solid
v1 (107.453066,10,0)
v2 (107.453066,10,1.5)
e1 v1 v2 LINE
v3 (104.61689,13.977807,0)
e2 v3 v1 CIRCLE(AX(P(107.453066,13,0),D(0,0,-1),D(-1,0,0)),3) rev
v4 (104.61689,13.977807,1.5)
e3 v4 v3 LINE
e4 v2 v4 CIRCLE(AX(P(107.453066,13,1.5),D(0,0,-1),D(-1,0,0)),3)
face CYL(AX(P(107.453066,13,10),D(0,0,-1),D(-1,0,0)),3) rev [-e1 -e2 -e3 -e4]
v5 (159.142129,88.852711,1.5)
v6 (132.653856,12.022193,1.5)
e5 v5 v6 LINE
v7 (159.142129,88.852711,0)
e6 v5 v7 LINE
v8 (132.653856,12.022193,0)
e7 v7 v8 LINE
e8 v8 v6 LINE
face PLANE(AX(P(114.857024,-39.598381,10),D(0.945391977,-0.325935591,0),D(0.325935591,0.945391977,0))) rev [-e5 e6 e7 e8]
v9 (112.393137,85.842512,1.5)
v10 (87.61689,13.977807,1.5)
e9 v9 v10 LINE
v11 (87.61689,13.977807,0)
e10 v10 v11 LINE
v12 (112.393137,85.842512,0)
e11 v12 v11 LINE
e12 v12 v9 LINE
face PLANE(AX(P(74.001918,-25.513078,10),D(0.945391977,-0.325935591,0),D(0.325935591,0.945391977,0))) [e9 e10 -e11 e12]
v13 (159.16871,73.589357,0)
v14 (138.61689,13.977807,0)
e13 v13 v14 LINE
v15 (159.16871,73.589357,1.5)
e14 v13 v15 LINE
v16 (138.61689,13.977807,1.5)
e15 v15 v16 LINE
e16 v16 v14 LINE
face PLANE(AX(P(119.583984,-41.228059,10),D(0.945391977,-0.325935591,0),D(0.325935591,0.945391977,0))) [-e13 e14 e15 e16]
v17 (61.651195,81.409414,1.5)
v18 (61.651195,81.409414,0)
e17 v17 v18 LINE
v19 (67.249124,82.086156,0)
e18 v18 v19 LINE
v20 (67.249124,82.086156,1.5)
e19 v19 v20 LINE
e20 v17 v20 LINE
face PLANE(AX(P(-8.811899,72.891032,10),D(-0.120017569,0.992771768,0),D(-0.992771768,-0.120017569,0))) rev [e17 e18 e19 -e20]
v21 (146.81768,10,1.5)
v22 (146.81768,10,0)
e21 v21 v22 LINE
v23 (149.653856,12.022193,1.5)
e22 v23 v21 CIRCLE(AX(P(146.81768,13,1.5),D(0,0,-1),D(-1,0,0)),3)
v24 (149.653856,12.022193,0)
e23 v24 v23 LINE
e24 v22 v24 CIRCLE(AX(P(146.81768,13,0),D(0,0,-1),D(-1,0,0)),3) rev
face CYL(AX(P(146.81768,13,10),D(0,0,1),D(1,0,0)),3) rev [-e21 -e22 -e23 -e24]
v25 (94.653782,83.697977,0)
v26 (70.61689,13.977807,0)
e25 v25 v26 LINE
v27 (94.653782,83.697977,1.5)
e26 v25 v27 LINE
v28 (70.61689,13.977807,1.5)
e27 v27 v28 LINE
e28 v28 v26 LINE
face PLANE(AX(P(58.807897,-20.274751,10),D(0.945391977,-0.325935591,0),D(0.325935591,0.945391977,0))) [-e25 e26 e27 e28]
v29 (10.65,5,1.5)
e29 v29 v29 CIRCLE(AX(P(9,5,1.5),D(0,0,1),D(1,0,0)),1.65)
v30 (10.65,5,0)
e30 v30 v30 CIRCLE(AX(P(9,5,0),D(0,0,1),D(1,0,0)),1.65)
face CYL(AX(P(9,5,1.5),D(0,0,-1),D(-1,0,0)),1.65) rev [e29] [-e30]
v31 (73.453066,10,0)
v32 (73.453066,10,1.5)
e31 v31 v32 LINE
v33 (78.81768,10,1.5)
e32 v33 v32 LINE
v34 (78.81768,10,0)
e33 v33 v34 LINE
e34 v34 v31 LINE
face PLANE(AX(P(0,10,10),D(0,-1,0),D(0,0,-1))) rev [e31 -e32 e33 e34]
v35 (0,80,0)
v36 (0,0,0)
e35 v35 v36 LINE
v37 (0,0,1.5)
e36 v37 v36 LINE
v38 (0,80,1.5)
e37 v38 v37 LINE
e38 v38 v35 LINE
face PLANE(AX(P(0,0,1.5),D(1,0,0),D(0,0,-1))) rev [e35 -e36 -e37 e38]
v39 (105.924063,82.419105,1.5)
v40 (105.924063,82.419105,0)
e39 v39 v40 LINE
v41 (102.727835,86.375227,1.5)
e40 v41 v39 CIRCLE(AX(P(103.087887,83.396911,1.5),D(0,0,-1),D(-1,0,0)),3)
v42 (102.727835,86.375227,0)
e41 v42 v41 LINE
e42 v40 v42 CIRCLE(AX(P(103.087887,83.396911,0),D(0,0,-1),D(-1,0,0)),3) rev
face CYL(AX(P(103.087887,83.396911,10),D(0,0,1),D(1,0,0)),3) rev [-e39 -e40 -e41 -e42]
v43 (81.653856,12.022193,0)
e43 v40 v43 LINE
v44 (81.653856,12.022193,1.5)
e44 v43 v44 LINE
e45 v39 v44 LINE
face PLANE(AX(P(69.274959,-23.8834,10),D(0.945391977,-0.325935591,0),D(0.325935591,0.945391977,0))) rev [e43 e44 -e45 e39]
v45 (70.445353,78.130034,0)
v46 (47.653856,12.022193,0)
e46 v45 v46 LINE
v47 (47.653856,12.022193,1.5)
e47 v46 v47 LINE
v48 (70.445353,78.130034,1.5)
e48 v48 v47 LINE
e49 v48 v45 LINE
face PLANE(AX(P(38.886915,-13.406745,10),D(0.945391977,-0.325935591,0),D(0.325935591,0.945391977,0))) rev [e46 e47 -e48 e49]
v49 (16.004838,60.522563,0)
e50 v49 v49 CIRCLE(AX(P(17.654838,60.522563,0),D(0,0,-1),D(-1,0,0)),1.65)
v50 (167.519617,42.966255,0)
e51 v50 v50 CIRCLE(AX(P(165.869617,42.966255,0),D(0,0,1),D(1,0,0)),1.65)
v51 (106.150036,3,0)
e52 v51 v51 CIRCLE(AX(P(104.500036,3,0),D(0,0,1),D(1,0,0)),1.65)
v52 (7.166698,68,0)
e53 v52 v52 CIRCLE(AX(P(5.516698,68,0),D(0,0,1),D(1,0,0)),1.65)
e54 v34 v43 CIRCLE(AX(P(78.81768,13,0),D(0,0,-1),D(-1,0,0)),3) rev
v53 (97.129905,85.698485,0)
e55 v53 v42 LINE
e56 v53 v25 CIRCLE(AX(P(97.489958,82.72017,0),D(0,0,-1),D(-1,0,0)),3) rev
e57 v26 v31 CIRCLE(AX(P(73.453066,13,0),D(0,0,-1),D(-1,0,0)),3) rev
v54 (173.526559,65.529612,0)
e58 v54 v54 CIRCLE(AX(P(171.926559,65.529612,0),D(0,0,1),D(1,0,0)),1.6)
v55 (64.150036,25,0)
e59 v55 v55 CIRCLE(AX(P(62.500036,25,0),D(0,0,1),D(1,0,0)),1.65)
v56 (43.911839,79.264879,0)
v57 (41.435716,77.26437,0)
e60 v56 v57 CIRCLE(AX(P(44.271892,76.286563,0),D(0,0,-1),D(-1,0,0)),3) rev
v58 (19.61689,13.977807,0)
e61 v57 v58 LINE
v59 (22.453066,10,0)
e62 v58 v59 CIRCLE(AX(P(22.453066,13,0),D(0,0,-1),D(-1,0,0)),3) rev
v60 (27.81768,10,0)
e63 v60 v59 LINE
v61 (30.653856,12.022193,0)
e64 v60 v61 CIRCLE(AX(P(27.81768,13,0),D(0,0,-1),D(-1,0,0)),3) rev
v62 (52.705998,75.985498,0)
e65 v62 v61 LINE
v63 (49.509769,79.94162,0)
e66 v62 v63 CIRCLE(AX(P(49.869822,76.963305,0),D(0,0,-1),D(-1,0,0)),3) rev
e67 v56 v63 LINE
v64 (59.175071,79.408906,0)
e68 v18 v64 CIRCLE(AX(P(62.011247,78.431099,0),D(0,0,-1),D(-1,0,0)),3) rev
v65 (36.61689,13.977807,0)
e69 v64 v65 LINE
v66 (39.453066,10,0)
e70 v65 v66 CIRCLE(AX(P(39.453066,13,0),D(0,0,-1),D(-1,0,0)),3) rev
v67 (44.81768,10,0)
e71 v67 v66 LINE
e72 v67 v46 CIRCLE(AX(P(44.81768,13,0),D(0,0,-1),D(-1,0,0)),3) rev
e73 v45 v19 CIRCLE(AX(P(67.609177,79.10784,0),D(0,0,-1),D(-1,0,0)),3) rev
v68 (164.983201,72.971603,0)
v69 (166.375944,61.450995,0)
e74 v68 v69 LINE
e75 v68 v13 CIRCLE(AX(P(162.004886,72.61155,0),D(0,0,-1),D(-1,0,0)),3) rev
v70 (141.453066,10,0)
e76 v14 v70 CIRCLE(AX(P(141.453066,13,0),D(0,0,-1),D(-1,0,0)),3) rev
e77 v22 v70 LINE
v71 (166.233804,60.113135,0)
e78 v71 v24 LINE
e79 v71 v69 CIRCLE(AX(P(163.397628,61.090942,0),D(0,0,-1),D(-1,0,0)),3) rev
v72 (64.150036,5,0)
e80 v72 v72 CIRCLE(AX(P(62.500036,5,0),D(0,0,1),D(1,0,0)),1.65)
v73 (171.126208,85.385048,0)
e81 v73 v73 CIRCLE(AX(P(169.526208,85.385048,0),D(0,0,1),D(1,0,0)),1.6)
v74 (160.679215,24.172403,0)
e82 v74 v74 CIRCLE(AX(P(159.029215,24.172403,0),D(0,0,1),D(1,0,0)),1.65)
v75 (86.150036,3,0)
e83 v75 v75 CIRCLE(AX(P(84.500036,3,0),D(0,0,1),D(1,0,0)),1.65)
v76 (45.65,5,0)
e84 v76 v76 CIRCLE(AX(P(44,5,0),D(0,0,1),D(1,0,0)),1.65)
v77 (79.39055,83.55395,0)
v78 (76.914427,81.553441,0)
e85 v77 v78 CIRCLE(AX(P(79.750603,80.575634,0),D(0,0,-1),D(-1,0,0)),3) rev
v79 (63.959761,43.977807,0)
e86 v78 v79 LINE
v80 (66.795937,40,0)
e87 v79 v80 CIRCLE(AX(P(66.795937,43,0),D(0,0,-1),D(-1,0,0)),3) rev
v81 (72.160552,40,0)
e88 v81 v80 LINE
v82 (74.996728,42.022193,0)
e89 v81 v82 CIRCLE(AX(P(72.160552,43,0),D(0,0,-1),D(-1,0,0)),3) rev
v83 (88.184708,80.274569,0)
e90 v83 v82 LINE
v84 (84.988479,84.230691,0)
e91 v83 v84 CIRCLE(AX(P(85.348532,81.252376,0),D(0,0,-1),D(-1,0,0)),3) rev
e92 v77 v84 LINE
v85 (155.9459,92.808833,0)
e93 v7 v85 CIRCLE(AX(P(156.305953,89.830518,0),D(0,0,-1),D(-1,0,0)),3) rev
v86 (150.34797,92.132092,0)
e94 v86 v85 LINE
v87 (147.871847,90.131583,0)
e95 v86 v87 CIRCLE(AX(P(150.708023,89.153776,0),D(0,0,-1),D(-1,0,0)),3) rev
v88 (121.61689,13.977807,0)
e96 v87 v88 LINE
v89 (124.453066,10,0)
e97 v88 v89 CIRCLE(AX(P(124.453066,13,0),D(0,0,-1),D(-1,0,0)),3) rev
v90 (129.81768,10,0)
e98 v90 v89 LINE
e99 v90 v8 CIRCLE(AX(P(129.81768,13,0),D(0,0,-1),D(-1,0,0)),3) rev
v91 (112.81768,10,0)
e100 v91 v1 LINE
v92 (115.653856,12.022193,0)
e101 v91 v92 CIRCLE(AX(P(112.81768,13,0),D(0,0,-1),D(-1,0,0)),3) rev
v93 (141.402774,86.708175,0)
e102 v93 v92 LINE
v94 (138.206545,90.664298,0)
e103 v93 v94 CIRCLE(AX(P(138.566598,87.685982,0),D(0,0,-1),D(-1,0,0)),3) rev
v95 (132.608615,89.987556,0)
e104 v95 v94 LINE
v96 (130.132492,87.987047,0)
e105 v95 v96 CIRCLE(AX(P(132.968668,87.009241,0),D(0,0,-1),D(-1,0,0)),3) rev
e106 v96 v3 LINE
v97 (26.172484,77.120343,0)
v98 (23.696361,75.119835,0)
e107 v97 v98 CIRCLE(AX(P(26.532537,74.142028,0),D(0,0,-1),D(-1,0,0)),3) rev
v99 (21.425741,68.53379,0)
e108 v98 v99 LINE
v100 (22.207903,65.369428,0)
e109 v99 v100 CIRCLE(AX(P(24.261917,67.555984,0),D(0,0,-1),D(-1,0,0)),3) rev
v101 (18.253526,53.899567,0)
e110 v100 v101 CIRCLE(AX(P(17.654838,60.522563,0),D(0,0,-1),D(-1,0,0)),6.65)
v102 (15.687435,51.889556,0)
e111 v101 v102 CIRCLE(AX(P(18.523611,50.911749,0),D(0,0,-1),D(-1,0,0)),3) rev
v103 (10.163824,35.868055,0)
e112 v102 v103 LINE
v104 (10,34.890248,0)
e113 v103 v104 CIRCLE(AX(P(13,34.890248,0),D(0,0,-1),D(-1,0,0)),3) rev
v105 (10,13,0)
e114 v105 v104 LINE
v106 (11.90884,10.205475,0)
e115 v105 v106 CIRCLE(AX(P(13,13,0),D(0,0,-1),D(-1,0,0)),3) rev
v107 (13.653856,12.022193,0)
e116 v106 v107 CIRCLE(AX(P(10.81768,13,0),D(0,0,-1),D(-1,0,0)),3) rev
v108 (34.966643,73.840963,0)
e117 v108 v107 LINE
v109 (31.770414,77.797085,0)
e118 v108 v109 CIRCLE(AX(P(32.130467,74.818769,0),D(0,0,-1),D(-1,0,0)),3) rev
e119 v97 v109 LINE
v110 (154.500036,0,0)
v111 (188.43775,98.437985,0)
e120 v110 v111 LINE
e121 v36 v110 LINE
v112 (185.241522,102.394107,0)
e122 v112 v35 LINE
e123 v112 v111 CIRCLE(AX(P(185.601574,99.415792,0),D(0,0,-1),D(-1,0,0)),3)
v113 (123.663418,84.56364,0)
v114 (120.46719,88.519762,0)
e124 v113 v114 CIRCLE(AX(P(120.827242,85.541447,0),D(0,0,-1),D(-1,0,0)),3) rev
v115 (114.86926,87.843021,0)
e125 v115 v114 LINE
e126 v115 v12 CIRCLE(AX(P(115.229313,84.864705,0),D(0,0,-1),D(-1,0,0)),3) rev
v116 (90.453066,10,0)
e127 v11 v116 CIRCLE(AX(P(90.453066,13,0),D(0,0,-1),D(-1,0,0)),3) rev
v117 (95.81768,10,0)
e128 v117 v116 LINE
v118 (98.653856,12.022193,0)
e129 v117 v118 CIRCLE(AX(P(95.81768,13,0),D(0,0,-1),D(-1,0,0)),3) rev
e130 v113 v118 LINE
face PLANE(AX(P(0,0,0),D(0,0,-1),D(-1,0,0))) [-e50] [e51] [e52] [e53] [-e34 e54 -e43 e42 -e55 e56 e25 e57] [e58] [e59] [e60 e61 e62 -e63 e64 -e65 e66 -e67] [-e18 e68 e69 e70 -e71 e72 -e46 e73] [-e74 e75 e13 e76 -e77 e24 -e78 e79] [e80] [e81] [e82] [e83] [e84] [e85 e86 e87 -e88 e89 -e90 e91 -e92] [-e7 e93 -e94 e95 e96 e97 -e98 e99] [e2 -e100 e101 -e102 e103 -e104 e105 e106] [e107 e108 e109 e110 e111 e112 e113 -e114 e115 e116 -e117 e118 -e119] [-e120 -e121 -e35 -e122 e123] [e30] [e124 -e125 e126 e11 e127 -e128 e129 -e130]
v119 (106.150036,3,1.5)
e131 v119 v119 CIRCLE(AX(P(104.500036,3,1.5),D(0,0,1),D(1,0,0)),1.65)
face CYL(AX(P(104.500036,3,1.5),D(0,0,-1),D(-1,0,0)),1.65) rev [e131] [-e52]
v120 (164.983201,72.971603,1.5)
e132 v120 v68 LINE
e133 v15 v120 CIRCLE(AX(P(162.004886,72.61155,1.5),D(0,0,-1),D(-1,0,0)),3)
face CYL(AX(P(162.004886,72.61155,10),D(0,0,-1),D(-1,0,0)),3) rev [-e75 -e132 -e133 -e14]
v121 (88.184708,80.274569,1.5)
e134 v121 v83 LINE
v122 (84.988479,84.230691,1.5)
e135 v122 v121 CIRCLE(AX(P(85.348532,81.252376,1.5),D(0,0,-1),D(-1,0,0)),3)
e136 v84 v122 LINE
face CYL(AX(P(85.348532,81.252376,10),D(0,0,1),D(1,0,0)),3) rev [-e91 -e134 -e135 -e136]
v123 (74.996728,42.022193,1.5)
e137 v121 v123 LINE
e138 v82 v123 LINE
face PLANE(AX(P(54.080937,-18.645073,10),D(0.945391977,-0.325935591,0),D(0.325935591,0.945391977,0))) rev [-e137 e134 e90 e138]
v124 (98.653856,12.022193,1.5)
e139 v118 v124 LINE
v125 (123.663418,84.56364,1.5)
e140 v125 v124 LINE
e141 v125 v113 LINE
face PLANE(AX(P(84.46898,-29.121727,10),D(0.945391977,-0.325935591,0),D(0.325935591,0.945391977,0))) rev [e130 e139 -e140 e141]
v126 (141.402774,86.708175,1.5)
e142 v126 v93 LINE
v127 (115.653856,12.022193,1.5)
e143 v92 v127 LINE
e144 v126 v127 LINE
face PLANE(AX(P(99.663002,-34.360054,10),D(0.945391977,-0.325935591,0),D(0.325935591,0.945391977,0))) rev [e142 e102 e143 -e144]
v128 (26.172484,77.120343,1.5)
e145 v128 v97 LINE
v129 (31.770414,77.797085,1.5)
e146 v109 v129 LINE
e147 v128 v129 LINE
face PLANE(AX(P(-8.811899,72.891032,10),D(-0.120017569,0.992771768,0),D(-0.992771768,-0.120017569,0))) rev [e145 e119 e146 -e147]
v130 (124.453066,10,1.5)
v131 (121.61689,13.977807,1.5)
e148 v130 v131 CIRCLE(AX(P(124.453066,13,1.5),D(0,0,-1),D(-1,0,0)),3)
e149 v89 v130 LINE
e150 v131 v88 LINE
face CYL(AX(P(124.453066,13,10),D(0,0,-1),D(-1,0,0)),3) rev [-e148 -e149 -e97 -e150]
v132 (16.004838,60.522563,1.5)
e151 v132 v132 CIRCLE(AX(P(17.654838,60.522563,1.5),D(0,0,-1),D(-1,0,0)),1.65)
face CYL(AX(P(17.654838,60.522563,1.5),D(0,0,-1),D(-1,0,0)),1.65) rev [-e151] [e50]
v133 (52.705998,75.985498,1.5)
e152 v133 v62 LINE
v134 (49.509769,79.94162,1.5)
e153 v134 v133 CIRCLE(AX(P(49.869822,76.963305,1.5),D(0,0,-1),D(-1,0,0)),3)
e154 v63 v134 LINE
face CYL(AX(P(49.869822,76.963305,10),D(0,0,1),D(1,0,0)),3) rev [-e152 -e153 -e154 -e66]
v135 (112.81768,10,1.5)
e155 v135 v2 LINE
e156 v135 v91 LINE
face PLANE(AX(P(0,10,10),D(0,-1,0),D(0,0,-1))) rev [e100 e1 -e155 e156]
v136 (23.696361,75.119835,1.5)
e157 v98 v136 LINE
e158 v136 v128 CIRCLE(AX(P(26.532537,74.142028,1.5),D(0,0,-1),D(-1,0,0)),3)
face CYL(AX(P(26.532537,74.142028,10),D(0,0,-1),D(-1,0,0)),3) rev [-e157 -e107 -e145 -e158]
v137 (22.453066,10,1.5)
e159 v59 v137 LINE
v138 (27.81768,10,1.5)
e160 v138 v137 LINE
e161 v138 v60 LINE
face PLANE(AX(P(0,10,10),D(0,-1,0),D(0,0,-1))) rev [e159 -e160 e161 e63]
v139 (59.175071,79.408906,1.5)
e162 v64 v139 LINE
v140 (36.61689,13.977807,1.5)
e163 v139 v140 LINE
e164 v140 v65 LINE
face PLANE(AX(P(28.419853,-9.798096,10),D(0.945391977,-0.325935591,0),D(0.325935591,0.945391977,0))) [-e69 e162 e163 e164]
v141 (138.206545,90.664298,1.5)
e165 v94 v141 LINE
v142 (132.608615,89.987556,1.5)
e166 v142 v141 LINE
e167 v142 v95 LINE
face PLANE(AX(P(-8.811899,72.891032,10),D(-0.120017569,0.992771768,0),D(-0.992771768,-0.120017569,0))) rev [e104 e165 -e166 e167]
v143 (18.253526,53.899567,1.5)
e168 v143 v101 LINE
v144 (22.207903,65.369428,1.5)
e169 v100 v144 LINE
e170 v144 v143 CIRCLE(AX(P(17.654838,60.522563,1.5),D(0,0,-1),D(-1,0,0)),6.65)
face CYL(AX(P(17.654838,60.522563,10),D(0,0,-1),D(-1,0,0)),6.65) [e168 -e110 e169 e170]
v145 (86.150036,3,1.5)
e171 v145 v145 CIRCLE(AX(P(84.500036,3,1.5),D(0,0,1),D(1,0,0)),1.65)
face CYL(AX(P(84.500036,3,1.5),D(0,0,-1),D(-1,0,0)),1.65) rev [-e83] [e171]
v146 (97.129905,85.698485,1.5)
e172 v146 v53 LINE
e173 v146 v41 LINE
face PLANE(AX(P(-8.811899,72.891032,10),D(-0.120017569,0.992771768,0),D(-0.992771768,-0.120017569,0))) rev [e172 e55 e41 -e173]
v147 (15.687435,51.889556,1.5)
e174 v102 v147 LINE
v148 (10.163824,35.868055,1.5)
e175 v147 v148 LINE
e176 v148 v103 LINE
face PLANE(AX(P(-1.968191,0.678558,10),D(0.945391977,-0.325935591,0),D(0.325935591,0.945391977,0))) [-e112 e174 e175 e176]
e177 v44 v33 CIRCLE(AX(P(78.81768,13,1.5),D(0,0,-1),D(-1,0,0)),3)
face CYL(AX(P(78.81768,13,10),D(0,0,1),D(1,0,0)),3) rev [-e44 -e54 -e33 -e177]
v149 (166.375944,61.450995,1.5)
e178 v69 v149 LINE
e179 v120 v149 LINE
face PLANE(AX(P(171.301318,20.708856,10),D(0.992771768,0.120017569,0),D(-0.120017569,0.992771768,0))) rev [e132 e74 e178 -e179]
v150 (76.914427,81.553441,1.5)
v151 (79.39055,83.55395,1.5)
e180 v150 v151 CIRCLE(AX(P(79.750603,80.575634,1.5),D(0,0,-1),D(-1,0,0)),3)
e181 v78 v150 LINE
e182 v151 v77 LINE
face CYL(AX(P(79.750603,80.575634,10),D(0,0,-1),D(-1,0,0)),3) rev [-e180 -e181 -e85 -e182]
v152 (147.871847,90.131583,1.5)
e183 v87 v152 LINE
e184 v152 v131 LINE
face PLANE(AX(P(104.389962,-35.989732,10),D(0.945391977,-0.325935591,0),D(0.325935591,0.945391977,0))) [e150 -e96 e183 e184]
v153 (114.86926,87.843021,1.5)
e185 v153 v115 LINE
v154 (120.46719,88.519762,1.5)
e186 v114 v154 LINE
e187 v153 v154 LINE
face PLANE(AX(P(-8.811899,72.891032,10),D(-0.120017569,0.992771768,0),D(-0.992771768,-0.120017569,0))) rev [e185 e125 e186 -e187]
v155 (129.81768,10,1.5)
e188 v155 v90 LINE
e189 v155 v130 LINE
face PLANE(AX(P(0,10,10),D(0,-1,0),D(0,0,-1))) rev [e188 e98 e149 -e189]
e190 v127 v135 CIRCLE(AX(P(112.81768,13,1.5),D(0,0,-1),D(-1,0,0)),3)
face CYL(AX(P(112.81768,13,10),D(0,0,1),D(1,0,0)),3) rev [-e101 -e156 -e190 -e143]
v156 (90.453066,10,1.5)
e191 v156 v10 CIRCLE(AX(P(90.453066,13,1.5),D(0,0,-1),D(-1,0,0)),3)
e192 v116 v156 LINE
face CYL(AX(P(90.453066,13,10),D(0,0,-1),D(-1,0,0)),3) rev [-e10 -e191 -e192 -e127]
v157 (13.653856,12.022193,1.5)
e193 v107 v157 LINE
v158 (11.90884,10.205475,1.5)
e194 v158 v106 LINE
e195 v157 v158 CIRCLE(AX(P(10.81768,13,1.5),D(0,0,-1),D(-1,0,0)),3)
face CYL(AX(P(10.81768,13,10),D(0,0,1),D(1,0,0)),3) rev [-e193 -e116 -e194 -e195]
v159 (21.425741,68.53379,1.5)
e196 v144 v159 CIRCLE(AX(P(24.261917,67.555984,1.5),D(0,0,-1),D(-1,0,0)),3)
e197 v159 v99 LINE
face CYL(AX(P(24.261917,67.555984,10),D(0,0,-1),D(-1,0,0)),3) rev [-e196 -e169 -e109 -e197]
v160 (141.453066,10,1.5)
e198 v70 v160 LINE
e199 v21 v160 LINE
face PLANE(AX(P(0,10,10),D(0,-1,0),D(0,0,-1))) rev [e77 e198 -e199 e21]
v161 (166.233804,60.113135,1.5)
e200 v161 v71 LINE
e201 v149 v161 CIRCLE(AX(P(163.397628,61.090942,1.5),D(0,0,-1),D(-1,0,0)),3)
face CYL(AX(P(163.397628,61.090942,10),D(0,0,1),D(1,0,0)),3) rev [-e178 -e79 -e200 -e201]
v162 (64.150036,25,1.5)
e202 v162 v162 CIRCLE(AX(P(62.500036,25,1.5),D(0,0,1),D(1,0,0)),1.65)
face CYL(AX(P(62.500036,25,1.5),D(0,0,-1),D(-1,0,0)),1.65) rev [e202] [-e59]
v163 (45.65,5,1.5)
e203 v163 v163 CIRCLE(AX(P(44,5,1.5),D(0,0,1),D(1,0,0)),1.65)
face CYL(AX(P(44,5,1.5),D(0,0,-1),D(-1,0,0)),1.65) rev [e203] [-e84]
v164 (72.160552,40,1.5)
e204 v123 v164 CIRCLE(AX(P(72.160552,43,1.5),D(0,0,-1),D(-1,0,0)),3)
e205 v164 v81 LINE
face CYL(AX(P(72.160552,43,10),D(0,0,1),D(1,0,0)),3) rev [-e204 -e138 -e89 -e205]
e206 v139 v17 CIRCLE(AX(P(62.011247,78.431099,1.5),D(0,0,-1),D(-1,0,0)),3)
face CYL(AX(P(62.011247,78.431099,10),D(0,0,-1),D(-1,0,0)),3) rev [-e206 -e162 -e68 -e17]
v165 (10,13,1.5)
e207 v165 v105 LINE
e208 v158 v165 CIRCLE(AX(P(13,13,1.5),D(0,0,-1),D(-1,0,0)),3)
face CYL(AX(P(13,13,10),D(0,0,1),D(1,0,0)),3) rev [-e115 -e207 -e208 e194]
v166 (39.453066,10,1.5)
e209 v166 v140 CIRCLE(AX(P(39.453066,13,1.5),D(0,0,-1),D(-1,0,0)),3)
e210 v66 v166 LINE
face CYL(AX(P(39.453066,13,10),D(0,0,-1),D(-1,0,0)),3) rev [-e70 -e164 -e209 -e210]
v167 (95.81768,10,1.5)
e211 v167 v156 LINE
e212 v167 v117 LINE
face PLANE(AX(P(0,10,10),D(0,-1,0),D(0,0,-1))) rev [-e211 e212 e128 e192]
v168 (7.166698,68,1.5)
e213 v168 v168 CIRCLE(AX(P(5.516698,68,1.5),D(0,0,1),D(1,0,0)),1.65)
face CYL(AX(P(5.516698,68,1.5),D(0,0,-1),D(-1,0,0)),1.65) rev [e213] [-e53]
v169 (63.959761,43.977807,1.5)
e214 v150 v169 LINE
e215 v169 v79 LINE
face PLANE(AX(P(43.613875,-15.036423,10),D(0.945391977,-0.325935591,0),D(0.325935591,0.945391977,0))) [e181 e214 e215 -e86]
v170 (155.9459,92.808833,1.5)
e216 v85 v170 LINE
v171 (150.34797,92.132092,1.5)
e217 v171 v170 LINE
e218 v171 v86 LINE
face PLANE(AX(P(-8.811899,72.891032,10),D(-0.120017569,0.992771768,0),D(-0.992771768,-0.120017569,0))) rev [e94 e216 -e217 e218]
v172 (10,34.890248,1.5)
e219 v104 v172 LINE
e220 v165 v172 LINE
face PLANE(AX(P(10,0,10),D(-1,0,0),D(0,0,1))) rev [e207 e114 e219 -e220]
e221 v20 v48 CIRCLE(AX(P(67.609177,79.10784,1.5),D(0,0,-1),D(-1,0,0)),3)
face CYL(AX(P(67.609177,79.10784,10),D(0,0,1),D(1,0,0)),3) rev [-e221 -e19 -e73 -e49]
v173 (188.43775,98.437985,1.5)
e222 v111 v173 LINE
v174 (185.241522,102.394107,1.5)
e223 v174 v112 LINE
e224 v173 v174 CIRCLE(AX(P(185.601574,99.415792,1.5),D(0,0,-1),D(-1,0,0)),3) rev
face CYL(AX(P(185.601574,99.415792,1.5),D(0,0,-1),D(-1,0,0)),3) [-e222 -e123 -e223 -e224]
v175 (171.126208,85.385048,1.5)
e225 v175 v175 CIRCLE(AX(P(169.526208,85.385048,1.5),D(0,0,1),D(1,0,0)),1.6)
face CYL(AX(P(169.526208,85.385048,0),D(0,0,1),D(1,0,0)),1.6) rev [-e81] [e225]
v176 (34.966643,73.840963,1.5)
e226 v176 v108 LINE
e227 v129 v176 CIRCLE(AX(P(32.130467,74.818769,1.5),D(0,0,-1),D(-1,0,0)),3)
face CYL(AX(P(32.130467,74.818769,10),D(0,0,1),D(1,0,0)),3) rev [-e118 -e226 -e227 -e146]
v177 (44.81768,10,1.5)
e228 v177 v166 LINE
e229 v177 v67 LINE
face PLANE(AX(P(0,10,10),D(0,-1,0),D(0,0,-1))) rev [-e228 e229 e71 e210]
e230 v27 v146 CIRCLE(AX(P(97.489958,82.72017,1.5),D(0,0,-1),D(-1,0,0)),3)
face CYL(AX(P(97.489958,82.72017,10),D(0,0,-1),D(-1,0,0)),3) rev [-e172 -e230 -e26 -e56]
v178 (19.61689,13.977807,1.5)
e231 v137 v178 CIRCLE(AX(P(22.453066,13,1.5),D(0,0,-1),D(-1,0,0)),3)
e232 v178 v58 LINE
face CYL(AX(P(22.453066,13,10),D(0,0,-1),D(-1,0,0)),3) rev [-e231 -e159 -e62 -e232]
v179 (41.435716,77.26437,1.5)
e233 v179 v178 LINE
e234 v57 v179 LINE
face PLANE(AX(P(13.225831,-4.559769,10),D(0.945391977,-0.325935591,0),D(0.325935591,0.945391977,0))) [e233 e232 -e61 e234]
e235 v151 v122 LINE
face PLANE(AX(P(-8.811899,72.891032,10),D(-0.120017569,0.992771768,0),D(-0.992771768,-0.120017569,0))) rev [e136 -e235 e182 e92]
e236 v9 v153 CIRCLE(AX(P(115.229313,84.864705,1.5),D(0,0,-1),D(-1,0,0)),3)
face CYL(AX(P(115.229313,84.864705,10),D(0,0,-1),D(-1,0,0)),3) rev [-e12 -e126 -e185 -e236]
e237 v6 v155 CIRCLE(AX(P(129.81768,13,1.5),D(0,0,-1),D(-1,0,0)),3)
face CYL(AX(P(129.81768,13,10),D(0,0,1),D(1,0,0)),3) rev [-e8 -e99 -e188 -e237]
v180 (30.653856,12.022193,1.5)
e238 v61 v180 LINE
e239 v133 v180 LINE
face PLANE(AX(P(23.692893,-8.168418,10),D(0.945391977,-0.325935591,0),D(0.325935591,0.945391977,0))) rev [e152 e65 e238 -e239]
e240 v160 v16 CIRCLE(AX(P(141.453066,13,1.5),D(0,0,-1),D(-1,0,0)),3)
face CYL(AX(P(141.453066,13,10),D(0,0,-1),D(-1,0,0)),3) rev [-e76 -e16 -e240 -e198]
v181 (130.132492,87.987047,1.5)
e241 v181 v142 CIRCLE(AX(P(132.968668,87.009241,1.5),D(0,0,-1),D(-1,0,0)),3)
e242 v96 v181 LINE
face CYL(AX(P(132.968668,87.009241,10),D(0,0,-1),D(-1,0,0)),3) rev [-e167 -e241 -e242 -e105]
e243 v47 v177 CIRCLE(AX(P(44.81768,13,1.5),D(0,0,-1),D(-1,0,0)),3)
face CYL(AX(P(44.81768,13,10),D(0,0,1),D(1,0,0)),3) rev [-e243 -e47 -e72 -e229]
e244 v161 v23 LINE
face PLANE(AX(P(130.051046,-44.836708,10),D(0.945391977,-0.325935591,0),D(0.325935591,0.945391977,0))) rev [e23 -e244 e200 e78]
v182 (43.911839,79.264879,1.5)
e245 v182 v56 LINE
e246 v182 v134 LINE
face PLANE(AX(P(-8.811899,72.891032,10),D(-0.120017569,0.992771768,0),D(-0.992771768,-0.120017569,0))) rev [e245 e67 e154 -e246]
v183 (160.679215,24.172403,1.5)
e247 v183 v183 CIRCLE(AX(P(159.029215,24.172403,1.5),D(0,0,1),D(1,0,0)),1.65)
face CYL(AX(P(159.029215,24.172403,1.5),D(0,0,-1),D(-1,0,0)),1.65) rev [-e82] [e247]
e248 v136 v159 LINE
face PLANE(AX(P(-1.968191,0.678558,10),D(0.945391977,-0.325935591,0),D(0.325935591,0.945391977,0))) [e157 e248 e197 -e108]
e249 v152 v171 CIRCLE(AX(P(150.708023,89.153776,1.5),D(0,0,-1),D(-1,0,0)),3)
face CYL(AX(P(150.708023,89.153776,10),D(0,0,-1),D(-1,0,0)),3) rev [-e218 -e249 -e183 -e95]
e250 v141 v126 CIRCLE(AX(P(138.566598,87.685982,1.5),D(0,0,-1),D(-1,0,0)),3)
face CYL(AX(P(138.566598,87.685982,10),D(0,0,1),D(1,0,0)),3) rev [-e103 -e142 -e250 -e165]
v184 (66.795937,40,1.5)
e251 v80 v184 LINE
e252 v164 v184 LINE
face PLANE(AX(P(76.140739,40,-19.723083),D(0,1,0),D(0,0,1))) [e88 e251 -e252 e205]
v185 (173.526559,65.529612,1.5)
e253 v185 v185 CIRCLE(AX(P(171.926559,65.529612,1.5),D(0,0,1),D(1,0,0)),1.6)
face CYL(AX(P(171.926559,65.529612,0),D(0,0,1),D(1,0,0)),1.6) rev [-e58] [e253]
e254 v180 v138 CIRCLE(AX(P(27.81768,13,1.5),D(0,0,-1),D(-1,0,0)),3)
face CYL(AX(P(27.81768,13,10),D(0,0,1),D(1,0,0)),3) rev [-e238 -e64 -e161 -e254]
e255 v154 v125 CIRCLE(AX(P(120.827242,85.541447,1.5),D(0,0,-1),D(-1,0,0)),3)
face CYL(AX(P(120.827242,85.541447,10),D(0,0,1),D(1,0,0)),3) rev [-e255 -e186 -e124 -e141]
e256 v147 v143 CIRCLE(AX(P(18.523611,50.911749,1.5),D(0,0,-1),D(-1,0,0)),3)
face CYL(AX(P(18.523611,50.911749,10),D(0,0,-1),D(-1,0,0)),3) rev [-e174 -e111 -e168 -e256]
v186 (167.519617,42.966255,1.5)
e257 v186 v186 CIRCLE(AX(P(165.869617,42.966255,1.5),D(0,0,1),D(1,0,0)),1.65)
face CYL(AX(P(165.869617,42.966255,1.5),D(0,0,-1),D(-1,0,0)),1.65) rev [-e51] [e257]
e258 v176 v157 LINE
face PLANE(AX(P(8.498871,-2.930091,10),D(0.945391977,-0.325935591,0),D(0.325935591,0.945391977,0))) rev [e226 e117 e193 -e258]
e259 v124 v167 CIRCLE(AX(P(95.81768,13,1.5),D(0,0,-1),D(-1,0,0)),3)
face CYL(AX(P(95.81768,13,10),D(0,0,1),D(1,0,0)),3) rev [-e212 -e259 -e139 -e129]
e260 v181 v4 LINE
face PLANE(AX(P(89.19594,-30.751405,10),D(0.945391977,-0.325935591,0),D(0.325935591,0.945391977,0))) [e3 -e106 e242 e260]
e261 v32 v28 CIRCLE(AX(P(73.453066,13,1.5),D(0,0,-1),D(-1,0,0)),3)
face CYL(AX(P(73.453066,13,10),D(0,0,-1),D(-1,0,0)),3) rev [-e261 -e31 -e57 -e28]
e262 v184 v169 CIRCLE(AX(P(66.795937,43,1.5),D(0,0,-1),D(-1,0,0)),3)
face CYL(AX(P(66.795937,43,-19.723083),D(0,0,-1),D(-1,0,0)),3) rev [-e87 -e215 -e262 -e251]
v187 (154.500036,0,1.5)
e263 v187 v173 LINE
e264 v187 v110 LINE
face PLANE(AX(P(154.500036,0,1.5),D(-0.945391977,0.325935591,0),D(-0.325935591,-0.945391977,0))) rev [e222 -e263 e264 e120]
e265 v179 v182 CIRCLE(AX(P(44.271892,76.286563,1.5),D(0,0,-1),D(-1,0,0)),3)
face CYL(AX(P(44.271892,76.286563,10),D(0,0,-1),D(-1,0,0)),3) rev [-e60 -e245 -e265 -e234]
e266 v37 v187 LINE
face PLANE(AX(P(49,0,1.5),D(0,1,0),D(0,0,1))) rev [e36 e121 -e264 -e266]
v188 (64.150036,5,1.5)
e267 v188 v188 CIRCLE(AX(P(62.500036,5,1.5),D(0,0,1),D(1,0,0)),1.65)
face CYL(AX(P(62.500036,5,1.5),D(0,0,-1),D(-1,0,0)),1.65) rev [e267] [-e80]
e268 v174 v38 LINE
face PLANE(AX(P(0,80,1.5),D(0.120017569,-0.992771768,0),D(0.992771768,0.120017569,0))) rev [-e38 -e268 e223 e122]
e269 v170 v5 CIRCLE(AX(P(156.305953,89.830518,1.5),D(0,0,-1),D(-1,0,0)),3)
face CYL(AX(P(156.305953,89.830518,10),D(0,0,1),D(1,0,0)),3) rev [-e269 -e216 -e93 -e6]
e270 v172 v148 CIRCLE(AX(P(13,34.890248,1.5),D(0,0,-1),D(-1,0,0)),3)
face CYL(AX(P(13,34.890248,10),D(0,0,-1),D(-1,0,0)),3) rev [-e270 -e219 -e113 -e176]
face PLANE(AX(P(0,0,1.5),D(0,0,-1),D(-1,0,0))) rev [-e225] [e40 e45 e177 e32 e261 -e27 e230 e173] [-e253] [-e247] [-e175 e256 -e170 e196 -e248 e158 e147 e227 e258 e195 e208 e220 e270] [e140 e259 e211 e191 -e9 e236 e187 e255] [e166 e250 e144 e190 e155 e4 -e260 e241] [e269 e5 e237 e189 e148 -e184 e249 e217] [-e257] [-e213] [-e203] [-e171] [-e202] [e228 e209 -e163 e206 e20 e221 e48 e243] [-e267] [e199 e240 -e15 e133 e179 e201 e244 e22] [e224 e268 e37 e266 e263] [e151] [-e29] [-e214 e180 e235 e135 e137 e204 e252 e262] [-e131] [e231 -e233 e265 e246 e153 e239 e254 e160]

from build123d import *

# Parameters (mm, degrees)
SKETCH_1_R          = 1.65
EXTRUDE_1_DEPTH     = 1.5
SKETCH_2_R          = 1.65
CUT_EXTRUDE_1_DEPTH = 217.113258134
SKETCH_5_R          = 1.6
CUT_EXTRUDE_3_DEPTH = 217.113258134
CUT_EXTRUDE_4_DEPTH = 10
FILLET_3_R          = 3
FILLET_4_R          = 5
SKETCH_7_W          = 17
SKETCH_7_H          = 10
EXTRUDE_2_DEPTH     = 1.5
FILLET_5_R          = 3
FILLET_6_R          = 3


with BuildPart() as part:
    # 草图1 → 凸台-拉伸1 (new body)
    with BuildSketch(Plane.XY):
        Polygon((0, 0), (49, 0), (154.500036, 0), (190, 102.969366032), (0, 80), align=None)
        with Locations((44, 5)):
            Circle(SKETCH_1_R, mode=Mode.SUBTRACT)
        with Locations((9, 5)):
            Circle(SKETCH_1_R, mode=Mode.SUBTRACT)
        with Locations((62.500036, 5)):
            Circle(SKETCH_1_R, mode=Mode.SUBTRACT)
        with Locations((62.500036, 25)):
            Circle(SKETCH_1_R, mode=Mode.SUBTRACT)
        with Locations((84.500036, 3)):
            Circle(SKETCH_1_R, mode=Mode.SUBTRACT)
        with Locations((104.500036, 3)):
            Circle(SKETCH_1_R, mode=Mode.SUBTRACT)
        with Locations((159.029214579, 24.172402674)):
            Circle(SKETCH_1_R, mode=Mode.SUBTRACT)
        with Locations((165.869617446, 42.96625509)):
            Circle(SKETCH_1_R, mode=Mode.SUBTRACT)
        with Locations((5.51669804, 68)):
            Circle(SKETCH_1_R, mode=Mode.SUBTRACT)
    extrude(amount=EXTRUDE_1_DEPTH)

    # 草图2 → 切除-拉伸1 (cut, through all)
    with BuildSketch(Plane(origin=(0, 0, 0), x_dir=(-1, 0, 0), z_dir=(0, 0, -1))):
        with Locations((-17.654838092, 60.522562577)):
            Circle(SKETCH_2_R)
    extrude(amount=-CUT_EXTRUDE_1_DEPTH, mode=Mode.SUBTRACT)

    # 草图5 → 切除-拉伸3 (cut, through all)
    with BuildSketch(Plane.XY.offset(1.5)):
        with Locations((169.526207601, 85.385047705)):
            Circle(SKETCH_5_R)
        with Locations((171.926558982, 65.529612347)):
            Circle(SKETCH_5_R)
    extrude(amount=-CUT_EXTRUDE_3_DEPTH, mode=Mode.SUBTRACT)

    # 草图6 → 切除-拉伸4 (cut)
    with BuildSketch(Plane(origin=(0, 0, 0), x_dir=(-1, 0, 0), z_dir=(0, 0, -1))):
        Polygon((-166.458788313, 60.765712768), (-148.956680209, 10), (-137.24549175, 10), (-163.418370686, 85.91570378), align=None)
        Polygon((-160.704378524, 93.384092174), (-131.956680209, 10), (-120.24549175, 10), (-148.483853144, 91.90673575), align=None)
        Polygon((-142.96502336, 91.23955669), (-114.956680209, 10), (-103.24549175, 10), (-130.74449798, 89.762200266), align=None)
        Polygon((-125.225668197, 89.095021206), (-97.956680209, 10), (-86.24549175, 10), (-113.005142817, 87.617664782), align=None)
        Polygon((-107.486313033, 86.950485723), (-80.956680209, 10), (-69.24549175, 10), (-95.265787653, 85.473129299), align=None)
        with BuildLine():
            Line((-77.526432489, 83.328593815), (-89.746957869, 84.805950239))
            Line((-89.746957869, 84.805950239), (-69.149740199, 25.062722173))
            ThreePointArc((-69.149740199, 25.062722173), (-65.935444688, 30.69389736), (-59.455145067, 30.91194885))
            Line((-59.455145067, 30.91194885), (-77.526432489, 83.328593815))
        make_face()
        with BuildLine():
            Line((-12.956680209, 10), (-10, 10))
            Line((-10, 10), (-10, 35.392875452))
            Line((-10, 35.392875452), (-16.411528112, 53.989823466))
            ThreePointArc((-16.411528112, 53.989823466), (-23.94169474, 58.355090898), (-20.701647581, 66.4335229))
            Line((-20.701647581, 66.4335229), (-24.308366998, 76.894987363))
            Line((-24.308366998, 76.894987363), (-36.528892378, 78.372343787))
            Line((-36.528892378, 78.372343787), (-12.956680209, 10))
        make_face()
        Polygon((-72.007602706, 82.661414755), (-46.956680209, 10), (-35.24549175, 10), (-59.787077326, 81.184058331), align=None)
        Polygon((-29.956680209, 10), (-18.24549175, 10), (-42.047722162, 79.039522847), (-54.268247542, 80.516879271), align=None)
    extrude(amount=-CUT_EXTRUDE_4_DEPTH, mode=Mode.SUBTRACT)

    # 圆角3
    # the kernel refuses this fillet: 3 mm, written as the material it adds along each edge
    with BuildSketch(Plane(origin=(89.746957869, 84.805950239, 0), x_dir=(-0.32593559085415924, -0.9453919772319576, 0), z_dir=(0, 0, 1)), Plane(origin=(107.486313033, 86.950485723, 0), x_dir=(-0.32593559085416013, -0.9453919772319572, 0), z_dir=(0, 0, 1)), Plane(origin=(54.268247542, 80.516879271, 0), x_dir=(-0.32593559085415885, -0.9453919772319577, 0), z_dir=(0, 0, 1)), Plane(origin=(125.225668197, 89.095021206, 0), x_dir=(-0.32593559085416013, -0.9453919772319572, 0), z_dir=(0, 0, 1)), Plane(origin=(142.96502336, 91.23955669, 0), x_dir=(-0.3259355908541637, -0.945391977231956, 0), z_dir=(0, 0, 1)), Plane(origin=(36.528892378, 78.372343787, 0), x_dir=(-0.32593559085416013, -0.9453919772319572, 0), z_dir=(0, 0, 1))) as fillet_3_piece_1:
        with BuildLine():
            CenterArc((FILLET_3_R * 1.59770807733, -FILLET_3_R), FILLET_3_R, 90, 115.915383649)
            Line((FILLET_3_R * 0.698267610033, -FILLET_3_R * 1.43704329967), (0, 0))
            Line((0, 0), (FILLET_3_R * 1.59770807733, 0))
        make_face()
    extrude(amount=1.5)
    with BuildSketch(Plane(origin=(77.526432489, 83.328593815, 0), x_dir=(-0.32593559085416024, -0.9453919772319572, 0), z_dir=(0, 0, 1))) as fillet_3_piece_2:
        with BuildLine():
            CenterArc((FILLET_3_R * 0.625896566582, FILLET_3_R), FILLET_3_R, 205.915383649, 64.084616351)
            Line((-FILLET_3_R * 0.273543900714, FILLET_3_R * 0.562956700325), (0, 0))
            Line((0, 0), (FILLET_3_R * 0.625896566582, 0))
        make_face()
    extrude(amount=1.5)
    with BuildSketch(Plane(origin=(95.265787653, 85.473129299, 0), x_dir=(0.9927717678876198, 0.12001756906924078, 0), z_dir=(0, 0, 1)), Plane(origin=(42.047722162, 79.039522847, 0), x_dir=(0.9927717678876197, 0.12001756906924214, 0), z_dir=(0, 0, 1)), Plane(origin=(59.787077326, 81.184058331, 0), x_dir=(0.9927717678876204, 0.12001756906923514, 0), z_dir=(0, 0, 1)), Plane(origin=(148.483853144, 91.90673575, 0), x_dir=(0.9927717678876198, 0.12001756906924078, 0), z_dir=(0, 0, 1)), Plane(origin=(113.005142817, 87.617664782, 0), x_dir=(0.9927717678876197, 0.12001756906924169, 0), z_dir=(0, 0, 1)), Plane(origin=(130.74449798, 89.762200266, 0), x_dir=(0.9927717678876193, 0.1200175690692444, 0), z_dir=(0, 0, 1)), Plane(origin=(24.308366998, 76.894987363, 0), x_dir=(0.9927717678876197, 0.12001756906924214, 0), z_dir=(0, 0, 1))) as fillet_3_piece_3:
        with BuildLine():
            CenterArc((FILLET_3_R * 0.625896566582, -FILLET_3_R), FILLET_3_R, 90, 64.084616351)
            Line((-FILLET_3_R * 0.273543900714, -FILLET_3_R * 0.562956700325), (0, 0))
            Line((0, 0), (FILLET_3_R * 0.625896566582, 0))
        make_face()
    extrude(amount=1.5)
    with BuildSketch(Plane(origin=(69.24549175, 10, 0), x_dir=(0.3259355908541607, 0.9453919772319569, 0), z_dir=(0, 0, 1)), Plane(origin=(35.24549175, 10, 0), x_dir=(0.3259355908541611, 0.9453919772319569, 0), z_dir=(0, 0, 1)), Plane(origin=(120.24549175, 10, 0), x_dir=(0.3259355908541582, 0.9453919772319579, 0), z_dir=(0, 0, 1)), Plane(origin=(137.24549175, 10, 0), x_dir=(0.3259355908541602, 0.9453919772319572, 0), z_dir=(0, 0, 1)), Plane(origin=(86.24549175, 10, 0), x_dir=(0.3259355908541607, 0.9453919772319569, 0), z_dir=(0, 0, 1)), Plane(origin=(103.24549175, 10, 0), x_dir=(0.3259355908541607, 0.9453919772319569, 0), z_dir=(0, 0, 1))) as fillet_3_piece_4:
        with BuildLine():
            CenterArc((FILLET_3_R * 1.40252469112, -FILLET_3_R), FILLET_3_R, 90, 109.022267108)
            Line((FILLET_3_R * 0.457132713888, -FILLET_3_R * 1.32593559085), (0, 0))
            Line((0, 0), (FILLET_3_R * 1.40252469112, 0))
        make_face()
    extrude(amount=1.5)
    with BuildSketch(Plane(origin=(80.956680209, 10, 0), x_dir=(0.32593559085415746, 0.9453919772319582, 0), z_dir=(0, 0, 1)), Plane(origin=(97.956680209, 10, 0), x_dir=(0.32593559085415946, 0.9453919772319574, 0), z_dir=(0, 0, 1)), Plane(origin=(114.956680209, 10, 0), x_dir=(0.3259355908541564, 0.9453919772319586, 0), z_dir=(0, 0, 1)), Plane(origin=(12.956680209, 10, 0), x_dir=(0.3259355908541589, 0.9453919772319578, 0), z_dir=(0, 0, 1))) as fillet_3_piece_5:
        with BuildLine():
            CenterArc((FILLET_3_R * 0.7129999253, FILLET_3_R), FILLET_3_R, 199.022267108, 70.977732892)
            Line((-FILLET_3_R * 0.232392051932, FILLET_3_R * 0.674064409146), (0, 0))
            Line((0, 0), (FILLET_3_R * 0.7129999253, 0))
        make_face()
    extrude(amount=1.5)
    with BuildSketch(Plane(origin=(18.24549175, 10, 0), x_dir=(1, 0, 0), z_dir=(0, 0, 1))) as fillet_3_piece_6:
        with BuildLine():
            CenterArc((FILLET_3_R * 1.40252469112, FILLET_3_R), FILLET_3_R, 160.977732892, 109.022267108)
            Line((FILLET_3_R * 0.457132713888, FILLET_3_R * 1.32593559085), (0, 0))
            Line((0, 0), (FILLET_3_R * 1.40252469112, 0))
        make_face()
    extrude(amount=1.5)
    with BuildSketch(Plane(origin=(29.956680209, 10, 0), x_dir=(-1, 0, 0), z_dir=(0, 0, 1)), Plane(origin=(46.956680209, 10, 0), x_dir=(-1, 0, 0), z_dir=(0, 0, 1)), Plane(origin=(131.956680209, 10, 0), x_dir=(-1, 0, 0), z_dir=(0, 0, 1)), Plane(origin=(148.956680209, 10, 0), x_dir=(-1, 0, 0), z_dir=(0, 0, 1))) as fillet_3_piece_7:
        with BuildLine():
            CenterArc((FILLET_3_R * 0.7129999253, -FILLET_3_R), FILLET_3_R, 90, 70.977732892)
            Line((-FILLET_3_R * 0.232392051932, -FILLET_3_R * 0.674064409146), (0, 0))
            Line((0, 0), (FILLET_3_R * 0.7129999253, 0))
        make_face()
    extrude(amount=1.5)
    with BuildSketch(Plane(origin=(72.007602706, 82.661414755, 0), x_dir=(-0.9927717678876198, -0.12001756906924071, 0), z_dir=(0, 0, 1)), Plane(origin=(160.704378524, 93.384092174, 0), x_dir=(-0.9927717678876197, -0.12001756906924108, 0), z_dir=(0, 0, 1))) as fillet_3_piece_8:
        with BuildLine():
            CenterArc((FILLET_3_R * 1.59770807733, FILLET_3_R), FILLET_3_R, 154.084616351, 115.915383649)
            Line((FILLET_3_R * 0.698267610033, FILLET_3_R * 1.43704329967), (0, 0))
            Line((0, 0), (FILLET_3_R * 1.59770807733, 0))
        make_face()
    extrude(amount=1.5)
    with BuildSketch(Plane(origin=(166.458788313, 60.765712768, 0), x_dir=(-0.3259355908541462, -0.9453919772319621, 0), z_dir=(0, 0, 1))) as fillet_3_piece_9:
        with BuildLine():
            CenterArc((FILLET_3_R * 0.230090548875, -FILLET_3_R), FILLET_3_R, 90, 25.915383649)
            Line((-FILLET_3_R * 0.2069527508, -FILLET_3_R * 0.100559532704), (0, 0))
            Line((0, 0), (FILLET_3_R * 0.230090548875, 0))
        make_face()
    extrude(amount=1.5)
    with BuildSketch(Plane(origin=(163.418370686, 85.91570378, 0), x_dir=(-0.3259355908541588, -0.9453919772319578, 0), z_dir=(0, 0, 1))) as fillet_3_piece_10:
        with BuildLine():
            CenterArc((FILLET_3_R * 4.34611506162, FILLET_3_R), FILLET_3_R, 115.915383649, 154.084616351)
            Line((FILLET_3_R * 3.90907176194, FILLET_3_R * 1.8994404673), (0, 0))
            Line((0, 0), (FILLET_3_R * 4.34611506162, 0))
        make_face()
    extrude(amount=1.5)
    with BuildSketch(Plane(origin=(20.701647581, 66.4335229, 0), x_dir=(0.3259355908541343, 0.9453919772319662, 0), z_dir=(0, 0, 1))) as fillet_3_piece_11:
        with BuildLine():
            CenterArc((2.221583802, -3), FILLET_3_R, 90, 65.812499939)
            ThreePointArc((-0.515044774, -1.770827906), (-0.195837699, -0.903354926), (0, 0))
            Line((0, 0), (2.221583802, 0))
        make_face()
    extrude(amount=1.5)
    with BuildSketch(Plane(origin=(16.411528112, 53.989823466, 0), x_dir=(0.9988016907645847, -0.04894060201720955, 0), z_dir=(0, 0, 1))) as fillet_3_piece_12:
        with BuildLine():
            CenterArc((2.260194582, -2.971019192), FILLET_3_R, 97.970443489, 65.812499939)
            Line((-0.620437185, -2.133188292), (0, 0))
            ThreePointArc((0, 0), (0.922103925, -0.064240792), (1.84420785, 0))
        make_face()
    extrude(amount=1.5)
    with BuildSketch(Plane(origin=(10, 35.392875452, 0), x_dir=(0.3259355908541632, 0.9453919772319561, 0), z_dir=(0, 0, 1))) as fillet_3_piece_13:
        with BuildLine():
            CenterArc((FILLET_3_R * 0.167542374323, -FILLET_3_R), FILLET_3_R, 90, 19.022267108)
            Line((-FILLET_3_R * 0.158393216531, -FILLET_3_R * 0.054608022768), (0, 0))
            Line((0, 0), (FILLET_3_R * 0.167542374323, 0))
        make_face()
    extrude(amount=1.5)
    with BuildSketch(Plane(origin=(10, 10, 0), x_dir=(0, 1, 0), z_dir=(0, 0, 1))) as fillet_3_piece_14:
        with BuildLine():
            CenterArc((FILLET_3_R, -FILLET_3_R), FILLET_3_R, 90, 90)
            Line((0, -FILLET_3_R), (0, 0))
            Line((0, 0), (FILLET_3_R, 0))
        make_face()
    extrude(amount=1.5)

    # 圆角4
    fillet_4_edges = [part.edges().sort_by_distance(p)[0] for p in [
        (69.149740199, 25.062722173, 0.75),
    ]]
    fillet(fillet_4_edges, radius=FILLET_4_R)

    # 草图7 → 凸台-拉伸2 (add)
    with BuildSketch(Plane.XY.offset(1.5)):
        with Locations((67.640739409, 35)):
            Rectangle(SKETCH_7_W, SKETCH_7_H)
    extrude(amount=-EXTRUDE_2_DEPTH)

    # 圆角5
    fillet_5_edges = [part.edges().sort_by_distance(p)[0] for p in [
        (62.588363238, 40, 0.75),
        (74.299551697, 40, 0.75),
    ]]
    fillet(fillet_5_edges, radius=FILLET_5_R)

    # 圆角6
    fillet_6_edges = [part.edges().sort_by_distance(p)[0] for p in [
        (190, 102.969366032, 0.75),
    ]]
    fillet(fillet_6_edges, radius=FILLET_6_R)


solid = part.part
